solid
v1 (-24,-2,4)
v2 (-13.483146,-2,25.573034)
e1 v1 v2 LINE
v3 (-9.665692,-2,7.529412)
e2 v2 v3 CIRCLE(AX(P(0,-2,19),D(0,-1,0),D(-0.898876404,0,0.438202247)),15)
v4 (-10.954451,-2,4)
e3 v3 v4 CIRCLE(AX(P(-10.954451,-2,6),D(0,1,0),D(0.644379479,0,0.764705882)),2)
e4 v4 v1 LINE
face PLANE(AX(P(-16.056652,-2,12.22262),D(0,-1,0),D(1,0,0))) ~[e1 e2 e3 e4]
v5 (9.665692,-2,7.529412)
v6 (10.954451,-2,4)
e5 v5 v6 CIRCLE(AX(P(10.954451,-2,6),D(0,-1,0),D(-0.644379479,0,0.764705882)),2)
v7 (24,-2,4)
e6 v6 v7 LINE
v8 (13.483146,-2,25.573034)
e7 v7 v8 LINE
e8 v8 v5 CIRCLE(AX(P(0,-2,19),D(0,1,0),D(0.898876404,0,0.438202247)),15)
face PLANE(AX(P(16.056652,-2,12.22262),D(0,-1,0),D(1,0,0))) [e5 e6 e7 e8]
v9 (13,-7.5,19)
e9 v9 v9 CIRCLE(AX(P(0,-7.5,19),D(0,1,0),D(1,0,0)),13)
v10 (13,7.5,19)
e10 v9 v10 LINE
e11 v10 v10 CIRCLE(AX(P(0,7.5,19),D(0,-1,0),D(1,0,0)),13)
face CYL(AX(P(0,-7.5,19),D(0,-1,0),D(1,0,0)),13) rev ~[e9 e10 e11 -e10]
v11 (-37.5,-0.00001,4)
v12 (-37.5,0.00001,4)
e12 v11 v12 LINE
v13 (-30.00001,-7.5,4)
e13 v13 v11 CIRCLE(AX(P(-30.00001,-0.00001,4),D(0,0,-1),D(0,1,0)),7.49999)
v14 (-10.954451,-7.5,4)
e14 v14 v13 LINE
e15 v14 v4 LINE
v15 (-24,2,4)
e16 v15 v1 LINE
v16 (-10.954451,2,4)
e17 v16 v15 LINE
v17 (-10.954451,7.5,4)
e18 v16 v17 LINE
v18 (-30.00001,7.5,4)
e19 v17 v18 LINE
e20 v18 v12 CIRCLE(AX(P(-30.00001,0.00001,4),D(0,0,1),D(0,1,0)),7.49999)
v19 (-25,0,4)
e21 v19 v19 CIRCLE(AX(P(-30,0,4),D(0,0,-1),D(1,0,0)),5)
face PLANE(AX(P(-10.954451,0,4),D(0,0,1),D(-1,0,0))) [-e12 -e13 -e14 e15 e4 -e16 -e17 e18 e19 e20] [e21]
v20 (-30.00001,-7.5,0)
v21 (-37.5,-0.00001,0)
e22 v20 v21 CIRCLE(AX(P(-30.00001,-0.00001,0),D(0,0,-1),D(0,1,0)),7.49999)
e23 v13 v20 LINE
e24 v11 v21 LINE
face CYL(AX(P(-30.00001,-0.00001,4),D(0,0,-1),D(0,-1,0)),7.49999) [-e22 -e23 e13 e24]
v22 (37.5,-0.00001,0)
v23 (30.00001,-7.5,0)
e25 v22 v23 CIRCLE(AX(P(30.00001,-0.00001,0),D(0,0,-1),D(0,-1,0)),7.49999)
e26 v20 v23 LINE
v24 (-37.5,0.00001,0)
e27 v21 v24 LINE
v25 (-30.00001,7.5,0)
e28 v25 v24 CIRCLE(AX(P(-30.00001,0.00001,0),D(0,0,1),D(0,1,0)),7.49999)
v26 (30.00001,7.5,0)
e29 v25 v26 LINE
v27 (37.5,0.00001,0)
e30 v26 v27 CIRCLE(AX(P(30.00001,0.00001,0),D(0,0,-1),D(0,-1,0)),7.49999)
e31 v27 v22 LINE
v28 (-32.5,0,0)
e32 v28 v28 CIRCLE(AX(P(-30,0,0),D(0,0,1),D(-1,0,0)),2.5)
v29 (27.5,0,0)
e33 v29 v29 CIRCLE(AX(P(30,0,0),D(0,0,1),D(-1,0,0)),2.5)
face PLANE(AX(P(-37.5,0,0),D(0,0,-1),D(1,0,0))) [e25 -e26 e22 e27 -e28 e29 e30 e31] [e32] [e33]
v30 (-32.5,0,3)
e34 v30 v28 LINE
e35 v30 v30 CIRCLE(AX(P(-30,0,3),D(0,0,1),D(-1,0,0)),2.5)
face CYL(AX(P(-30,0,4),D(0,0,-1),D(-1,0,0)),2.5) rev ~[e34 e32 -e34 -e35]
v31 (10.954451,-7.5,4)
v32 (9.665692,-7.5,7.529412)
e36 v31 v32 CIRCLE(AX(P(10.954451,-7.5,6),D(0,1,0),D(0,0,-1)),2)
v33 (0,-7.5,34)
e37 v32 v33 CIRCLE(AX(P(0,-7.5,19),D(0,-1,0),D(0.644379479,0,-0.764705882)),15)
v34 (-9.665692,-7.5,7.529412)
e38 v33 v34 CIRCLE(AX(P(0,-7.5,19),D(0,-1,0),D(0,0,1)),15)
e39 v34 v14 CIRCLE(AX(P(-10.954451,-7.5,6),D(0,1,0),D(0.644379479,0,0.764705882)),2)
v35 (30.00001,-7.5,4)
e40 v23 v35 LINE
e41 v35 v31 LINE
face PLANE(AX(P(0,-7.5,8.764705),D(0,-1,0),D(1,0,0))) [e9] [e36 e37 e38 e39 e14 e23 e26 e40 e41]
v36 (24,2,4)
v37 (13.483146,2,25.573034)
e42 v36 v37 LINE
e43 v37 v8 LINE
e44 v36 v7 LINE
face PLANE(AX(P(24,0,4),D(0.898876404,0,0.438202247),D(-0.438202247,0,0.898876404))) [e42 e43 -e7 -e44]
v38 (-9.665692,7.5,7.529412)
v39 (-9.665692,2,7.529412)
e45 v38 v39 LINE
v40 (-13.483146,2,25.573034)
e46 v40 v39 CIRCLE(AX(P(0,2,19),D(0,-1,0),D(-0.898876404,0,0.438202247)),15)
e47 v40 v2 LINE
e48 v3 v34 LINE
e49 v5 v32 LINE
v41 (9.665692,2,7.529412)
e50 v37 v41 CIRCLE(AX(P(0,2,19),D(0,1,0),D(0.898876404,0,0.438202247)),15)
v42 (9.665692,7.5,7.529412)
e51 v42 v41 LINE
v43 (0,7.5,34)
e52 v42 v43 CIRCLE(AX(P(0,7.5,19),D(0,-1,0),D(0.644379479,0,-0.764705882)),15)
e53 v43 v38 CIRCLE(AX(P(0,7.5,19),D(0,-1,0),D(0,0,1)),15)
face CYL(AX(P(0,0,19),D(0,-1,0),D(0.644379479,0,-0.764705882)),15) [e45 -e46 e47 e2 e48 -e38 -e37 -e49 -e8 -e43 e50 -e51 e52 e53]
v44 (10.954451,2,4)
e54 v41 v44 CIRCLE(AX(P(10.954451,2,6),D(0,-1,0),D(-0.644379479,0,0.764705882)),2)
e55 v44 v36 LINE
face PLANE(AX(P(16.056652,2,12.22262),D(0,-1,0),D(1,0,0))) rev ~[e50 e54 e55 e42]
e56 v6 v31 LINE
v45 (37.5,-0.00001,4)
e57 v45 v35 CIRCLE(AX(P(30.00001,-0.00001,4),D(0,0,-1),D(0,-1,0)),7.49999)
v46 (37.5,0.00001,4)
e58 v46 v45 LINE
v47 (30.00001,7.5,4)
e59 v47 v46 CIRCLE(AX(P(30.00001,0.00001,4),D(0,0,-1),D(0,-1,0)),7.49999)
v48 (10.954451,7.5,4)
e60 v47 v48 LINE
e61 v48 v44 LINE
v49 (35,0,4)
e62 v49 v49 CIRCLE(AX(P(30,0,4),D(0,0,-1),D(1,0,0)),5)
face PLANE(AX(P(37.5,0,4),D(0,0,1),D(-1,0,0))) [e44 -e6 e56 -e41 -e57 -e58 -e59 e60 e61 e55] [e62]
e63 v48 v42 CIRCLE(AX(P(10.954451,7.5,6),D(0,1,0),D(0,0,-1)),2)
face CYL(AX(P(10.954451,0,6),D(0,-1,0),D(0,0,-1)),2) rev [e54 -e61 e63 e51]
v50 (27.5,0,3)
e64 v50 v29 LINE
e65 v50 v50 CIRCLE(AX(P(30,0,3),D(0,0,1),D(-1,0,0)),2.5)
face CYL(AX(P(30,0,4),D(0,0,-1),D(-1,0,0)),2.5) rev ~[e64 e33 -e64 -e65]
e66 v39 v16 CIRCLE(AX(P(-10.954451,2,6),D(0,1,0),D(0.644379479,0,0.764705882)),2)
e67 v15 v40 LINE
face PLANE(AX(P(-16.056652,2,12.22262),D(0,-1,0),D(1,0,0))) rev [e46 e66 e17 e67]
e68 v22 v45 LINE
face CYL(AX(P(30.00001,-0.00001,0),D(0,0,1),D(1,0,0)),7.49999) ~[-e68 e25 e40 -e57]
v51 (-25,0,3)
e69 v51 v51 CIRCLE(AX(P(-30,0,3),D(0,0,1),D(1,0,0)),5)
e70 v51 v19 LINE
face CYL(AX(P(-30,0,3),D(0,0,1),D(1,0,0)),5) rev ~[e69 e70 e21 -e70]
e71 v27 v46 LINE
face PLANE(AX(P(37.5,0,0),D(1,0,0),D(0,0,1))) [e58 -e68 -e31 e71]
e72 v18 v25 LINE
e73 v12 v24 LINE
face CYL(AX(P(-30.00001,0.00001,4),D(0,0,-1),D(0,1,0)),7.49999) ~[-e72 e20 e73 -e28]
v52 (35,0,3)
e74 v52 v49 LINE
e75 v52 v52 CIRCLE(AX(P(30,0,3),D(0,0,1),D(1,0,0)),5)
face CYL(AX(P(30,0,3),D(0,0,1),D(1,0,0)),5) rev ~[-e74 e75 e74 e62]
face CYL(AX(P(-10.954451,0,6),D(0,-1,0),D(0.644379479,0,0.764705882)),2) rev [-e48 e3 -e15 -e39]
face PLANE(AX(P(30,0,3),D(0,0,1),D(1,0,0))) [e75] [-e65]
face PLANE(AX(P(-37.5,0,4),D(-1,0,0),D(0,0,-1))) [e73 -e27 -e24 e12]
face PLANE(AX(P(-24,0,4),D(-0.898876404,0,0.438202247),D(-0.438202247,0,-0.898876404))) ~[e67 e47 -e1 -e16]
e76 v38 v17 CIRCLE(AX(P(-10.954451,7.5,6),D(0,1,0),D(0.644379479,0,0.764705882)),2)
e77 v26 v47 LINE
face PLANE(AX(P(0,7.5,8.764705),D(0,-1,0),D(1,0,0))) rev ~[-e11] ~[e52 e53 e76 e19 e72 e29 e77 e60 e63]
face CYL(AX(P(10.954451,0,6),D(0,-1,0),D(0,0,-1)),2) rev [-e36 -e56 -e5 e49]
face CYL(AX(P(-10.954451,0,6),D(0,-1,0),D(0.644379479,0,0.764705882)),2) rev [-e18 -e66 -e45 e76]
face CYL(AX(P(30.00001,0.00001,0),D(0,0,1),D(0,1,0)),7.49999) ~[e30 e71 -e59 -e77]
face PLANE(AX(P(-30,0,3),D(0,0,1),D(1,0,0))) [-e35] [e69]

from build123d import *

# Parameters (mm, degrees)
F2_DEPTH       = 7.5
F3_R           = 13
F4_DEPTH       = 15.001
F5_R           = 7.49999
F7_D           = 5
F7_CBORE_D     = 10
F7_CBORE_DEPTH = 1
F9_DEPTH       = 2


# Not quite as in the source:
# - a fillet or chamfer is up to 0.001 mm smaller than in the source, because OpenCascade refuses the exact size


with BuildPart() as f2:
    # F1 (on Front) → F2 (new body, symmetric)
    with BuildSketch(Plane.XZ):
        with BuildLine():
            Line((-37.5, 0), (0, 0))
            Line((0, 0), (37.5, 0))
            Line((37.5, 0), (37.5, 4))
            Line((37.5, 4), (10.9544511501, 4))
            ThreePointArc((10.9544511501, 4), (9.0757782768, 5.3140056594), (9.6656921913, 7.5294117647))
            ThreePointArc((9.6656921913, 7.5294117647), (14.0900465494, 24.1449575543), (0, 34))
            ThreePointArc((0, 34), (-14.0900465494, 24.1449575543), (-9.6656921913, 7.5294117647))
            ThreePointArc((-9.6656921913, 7.5294117647), (-9.0757782768, 5.3140056594), (-10.9544511501, 4))
            Line((-10.9544511501, 4), (-37.5, 4))
            Line((-37.5, 4), (-37.5, 0))
        make_face()
    extrude(amount=F2_DEPTH, both=True)

    # F3 (on face) → F4 (cut, through all)
    with BuildSketch(Plane.XZ.offset(7.5)):
        with Locations((0, 19)):
            Circle(F3_R)
    extrude(amount=-F4_DEPTH, mode=Mode.SUBTRACT)

    # F5 (radius 7.5 in the source; OpenCascade refuses exactly that, so slightly less here)
    f5_edges = [f2.edges().sort_by_distance(p)[0] for p in [
        (37.5, -7.5, 2),
        (37.5, 7.5, 2),
        (-37.5, -7.5, 2),
        (-37.5, 7.5, 2),
    ]]
    fillet(f5_edges, radius=F5_R)

    # F7 (through all)
    with Locations(Plane.XY.offset(4)):
        with Locations((30, 0), (-30, 0)):
            CounterBoreHole(F7_D / 2, F7_CBORE_D / 2, F7_CBORE_DEPTH)

    # F8 (on Front) → F9 (join, symmetric)
    with BuildSketch(Plane.XZ):
        with BuildLine():
            Line((10.9544511501, 4), (24, 4))
            Line((24, 4), (13.4831460674, 25.5730337079))
            ThreePointArc((13.4831460674, 25.5730337079), (14.6751576274, 15.8952055444), (9.6656921913, 7.5294117647))
            ThreePointArc((9.6656921913, 7.5294117647), (9.0757782768, 5.3140056594), (10.9544511501, 4))
        make_face()
    extrude(amount=F9_DEPTH, both=True)

    # F10: F2 across plane


with BuildPart() as f2_1:
    add(f2.part)
    add(f2.part.mirror(Plane.YZ))


solid = f2_1.part
